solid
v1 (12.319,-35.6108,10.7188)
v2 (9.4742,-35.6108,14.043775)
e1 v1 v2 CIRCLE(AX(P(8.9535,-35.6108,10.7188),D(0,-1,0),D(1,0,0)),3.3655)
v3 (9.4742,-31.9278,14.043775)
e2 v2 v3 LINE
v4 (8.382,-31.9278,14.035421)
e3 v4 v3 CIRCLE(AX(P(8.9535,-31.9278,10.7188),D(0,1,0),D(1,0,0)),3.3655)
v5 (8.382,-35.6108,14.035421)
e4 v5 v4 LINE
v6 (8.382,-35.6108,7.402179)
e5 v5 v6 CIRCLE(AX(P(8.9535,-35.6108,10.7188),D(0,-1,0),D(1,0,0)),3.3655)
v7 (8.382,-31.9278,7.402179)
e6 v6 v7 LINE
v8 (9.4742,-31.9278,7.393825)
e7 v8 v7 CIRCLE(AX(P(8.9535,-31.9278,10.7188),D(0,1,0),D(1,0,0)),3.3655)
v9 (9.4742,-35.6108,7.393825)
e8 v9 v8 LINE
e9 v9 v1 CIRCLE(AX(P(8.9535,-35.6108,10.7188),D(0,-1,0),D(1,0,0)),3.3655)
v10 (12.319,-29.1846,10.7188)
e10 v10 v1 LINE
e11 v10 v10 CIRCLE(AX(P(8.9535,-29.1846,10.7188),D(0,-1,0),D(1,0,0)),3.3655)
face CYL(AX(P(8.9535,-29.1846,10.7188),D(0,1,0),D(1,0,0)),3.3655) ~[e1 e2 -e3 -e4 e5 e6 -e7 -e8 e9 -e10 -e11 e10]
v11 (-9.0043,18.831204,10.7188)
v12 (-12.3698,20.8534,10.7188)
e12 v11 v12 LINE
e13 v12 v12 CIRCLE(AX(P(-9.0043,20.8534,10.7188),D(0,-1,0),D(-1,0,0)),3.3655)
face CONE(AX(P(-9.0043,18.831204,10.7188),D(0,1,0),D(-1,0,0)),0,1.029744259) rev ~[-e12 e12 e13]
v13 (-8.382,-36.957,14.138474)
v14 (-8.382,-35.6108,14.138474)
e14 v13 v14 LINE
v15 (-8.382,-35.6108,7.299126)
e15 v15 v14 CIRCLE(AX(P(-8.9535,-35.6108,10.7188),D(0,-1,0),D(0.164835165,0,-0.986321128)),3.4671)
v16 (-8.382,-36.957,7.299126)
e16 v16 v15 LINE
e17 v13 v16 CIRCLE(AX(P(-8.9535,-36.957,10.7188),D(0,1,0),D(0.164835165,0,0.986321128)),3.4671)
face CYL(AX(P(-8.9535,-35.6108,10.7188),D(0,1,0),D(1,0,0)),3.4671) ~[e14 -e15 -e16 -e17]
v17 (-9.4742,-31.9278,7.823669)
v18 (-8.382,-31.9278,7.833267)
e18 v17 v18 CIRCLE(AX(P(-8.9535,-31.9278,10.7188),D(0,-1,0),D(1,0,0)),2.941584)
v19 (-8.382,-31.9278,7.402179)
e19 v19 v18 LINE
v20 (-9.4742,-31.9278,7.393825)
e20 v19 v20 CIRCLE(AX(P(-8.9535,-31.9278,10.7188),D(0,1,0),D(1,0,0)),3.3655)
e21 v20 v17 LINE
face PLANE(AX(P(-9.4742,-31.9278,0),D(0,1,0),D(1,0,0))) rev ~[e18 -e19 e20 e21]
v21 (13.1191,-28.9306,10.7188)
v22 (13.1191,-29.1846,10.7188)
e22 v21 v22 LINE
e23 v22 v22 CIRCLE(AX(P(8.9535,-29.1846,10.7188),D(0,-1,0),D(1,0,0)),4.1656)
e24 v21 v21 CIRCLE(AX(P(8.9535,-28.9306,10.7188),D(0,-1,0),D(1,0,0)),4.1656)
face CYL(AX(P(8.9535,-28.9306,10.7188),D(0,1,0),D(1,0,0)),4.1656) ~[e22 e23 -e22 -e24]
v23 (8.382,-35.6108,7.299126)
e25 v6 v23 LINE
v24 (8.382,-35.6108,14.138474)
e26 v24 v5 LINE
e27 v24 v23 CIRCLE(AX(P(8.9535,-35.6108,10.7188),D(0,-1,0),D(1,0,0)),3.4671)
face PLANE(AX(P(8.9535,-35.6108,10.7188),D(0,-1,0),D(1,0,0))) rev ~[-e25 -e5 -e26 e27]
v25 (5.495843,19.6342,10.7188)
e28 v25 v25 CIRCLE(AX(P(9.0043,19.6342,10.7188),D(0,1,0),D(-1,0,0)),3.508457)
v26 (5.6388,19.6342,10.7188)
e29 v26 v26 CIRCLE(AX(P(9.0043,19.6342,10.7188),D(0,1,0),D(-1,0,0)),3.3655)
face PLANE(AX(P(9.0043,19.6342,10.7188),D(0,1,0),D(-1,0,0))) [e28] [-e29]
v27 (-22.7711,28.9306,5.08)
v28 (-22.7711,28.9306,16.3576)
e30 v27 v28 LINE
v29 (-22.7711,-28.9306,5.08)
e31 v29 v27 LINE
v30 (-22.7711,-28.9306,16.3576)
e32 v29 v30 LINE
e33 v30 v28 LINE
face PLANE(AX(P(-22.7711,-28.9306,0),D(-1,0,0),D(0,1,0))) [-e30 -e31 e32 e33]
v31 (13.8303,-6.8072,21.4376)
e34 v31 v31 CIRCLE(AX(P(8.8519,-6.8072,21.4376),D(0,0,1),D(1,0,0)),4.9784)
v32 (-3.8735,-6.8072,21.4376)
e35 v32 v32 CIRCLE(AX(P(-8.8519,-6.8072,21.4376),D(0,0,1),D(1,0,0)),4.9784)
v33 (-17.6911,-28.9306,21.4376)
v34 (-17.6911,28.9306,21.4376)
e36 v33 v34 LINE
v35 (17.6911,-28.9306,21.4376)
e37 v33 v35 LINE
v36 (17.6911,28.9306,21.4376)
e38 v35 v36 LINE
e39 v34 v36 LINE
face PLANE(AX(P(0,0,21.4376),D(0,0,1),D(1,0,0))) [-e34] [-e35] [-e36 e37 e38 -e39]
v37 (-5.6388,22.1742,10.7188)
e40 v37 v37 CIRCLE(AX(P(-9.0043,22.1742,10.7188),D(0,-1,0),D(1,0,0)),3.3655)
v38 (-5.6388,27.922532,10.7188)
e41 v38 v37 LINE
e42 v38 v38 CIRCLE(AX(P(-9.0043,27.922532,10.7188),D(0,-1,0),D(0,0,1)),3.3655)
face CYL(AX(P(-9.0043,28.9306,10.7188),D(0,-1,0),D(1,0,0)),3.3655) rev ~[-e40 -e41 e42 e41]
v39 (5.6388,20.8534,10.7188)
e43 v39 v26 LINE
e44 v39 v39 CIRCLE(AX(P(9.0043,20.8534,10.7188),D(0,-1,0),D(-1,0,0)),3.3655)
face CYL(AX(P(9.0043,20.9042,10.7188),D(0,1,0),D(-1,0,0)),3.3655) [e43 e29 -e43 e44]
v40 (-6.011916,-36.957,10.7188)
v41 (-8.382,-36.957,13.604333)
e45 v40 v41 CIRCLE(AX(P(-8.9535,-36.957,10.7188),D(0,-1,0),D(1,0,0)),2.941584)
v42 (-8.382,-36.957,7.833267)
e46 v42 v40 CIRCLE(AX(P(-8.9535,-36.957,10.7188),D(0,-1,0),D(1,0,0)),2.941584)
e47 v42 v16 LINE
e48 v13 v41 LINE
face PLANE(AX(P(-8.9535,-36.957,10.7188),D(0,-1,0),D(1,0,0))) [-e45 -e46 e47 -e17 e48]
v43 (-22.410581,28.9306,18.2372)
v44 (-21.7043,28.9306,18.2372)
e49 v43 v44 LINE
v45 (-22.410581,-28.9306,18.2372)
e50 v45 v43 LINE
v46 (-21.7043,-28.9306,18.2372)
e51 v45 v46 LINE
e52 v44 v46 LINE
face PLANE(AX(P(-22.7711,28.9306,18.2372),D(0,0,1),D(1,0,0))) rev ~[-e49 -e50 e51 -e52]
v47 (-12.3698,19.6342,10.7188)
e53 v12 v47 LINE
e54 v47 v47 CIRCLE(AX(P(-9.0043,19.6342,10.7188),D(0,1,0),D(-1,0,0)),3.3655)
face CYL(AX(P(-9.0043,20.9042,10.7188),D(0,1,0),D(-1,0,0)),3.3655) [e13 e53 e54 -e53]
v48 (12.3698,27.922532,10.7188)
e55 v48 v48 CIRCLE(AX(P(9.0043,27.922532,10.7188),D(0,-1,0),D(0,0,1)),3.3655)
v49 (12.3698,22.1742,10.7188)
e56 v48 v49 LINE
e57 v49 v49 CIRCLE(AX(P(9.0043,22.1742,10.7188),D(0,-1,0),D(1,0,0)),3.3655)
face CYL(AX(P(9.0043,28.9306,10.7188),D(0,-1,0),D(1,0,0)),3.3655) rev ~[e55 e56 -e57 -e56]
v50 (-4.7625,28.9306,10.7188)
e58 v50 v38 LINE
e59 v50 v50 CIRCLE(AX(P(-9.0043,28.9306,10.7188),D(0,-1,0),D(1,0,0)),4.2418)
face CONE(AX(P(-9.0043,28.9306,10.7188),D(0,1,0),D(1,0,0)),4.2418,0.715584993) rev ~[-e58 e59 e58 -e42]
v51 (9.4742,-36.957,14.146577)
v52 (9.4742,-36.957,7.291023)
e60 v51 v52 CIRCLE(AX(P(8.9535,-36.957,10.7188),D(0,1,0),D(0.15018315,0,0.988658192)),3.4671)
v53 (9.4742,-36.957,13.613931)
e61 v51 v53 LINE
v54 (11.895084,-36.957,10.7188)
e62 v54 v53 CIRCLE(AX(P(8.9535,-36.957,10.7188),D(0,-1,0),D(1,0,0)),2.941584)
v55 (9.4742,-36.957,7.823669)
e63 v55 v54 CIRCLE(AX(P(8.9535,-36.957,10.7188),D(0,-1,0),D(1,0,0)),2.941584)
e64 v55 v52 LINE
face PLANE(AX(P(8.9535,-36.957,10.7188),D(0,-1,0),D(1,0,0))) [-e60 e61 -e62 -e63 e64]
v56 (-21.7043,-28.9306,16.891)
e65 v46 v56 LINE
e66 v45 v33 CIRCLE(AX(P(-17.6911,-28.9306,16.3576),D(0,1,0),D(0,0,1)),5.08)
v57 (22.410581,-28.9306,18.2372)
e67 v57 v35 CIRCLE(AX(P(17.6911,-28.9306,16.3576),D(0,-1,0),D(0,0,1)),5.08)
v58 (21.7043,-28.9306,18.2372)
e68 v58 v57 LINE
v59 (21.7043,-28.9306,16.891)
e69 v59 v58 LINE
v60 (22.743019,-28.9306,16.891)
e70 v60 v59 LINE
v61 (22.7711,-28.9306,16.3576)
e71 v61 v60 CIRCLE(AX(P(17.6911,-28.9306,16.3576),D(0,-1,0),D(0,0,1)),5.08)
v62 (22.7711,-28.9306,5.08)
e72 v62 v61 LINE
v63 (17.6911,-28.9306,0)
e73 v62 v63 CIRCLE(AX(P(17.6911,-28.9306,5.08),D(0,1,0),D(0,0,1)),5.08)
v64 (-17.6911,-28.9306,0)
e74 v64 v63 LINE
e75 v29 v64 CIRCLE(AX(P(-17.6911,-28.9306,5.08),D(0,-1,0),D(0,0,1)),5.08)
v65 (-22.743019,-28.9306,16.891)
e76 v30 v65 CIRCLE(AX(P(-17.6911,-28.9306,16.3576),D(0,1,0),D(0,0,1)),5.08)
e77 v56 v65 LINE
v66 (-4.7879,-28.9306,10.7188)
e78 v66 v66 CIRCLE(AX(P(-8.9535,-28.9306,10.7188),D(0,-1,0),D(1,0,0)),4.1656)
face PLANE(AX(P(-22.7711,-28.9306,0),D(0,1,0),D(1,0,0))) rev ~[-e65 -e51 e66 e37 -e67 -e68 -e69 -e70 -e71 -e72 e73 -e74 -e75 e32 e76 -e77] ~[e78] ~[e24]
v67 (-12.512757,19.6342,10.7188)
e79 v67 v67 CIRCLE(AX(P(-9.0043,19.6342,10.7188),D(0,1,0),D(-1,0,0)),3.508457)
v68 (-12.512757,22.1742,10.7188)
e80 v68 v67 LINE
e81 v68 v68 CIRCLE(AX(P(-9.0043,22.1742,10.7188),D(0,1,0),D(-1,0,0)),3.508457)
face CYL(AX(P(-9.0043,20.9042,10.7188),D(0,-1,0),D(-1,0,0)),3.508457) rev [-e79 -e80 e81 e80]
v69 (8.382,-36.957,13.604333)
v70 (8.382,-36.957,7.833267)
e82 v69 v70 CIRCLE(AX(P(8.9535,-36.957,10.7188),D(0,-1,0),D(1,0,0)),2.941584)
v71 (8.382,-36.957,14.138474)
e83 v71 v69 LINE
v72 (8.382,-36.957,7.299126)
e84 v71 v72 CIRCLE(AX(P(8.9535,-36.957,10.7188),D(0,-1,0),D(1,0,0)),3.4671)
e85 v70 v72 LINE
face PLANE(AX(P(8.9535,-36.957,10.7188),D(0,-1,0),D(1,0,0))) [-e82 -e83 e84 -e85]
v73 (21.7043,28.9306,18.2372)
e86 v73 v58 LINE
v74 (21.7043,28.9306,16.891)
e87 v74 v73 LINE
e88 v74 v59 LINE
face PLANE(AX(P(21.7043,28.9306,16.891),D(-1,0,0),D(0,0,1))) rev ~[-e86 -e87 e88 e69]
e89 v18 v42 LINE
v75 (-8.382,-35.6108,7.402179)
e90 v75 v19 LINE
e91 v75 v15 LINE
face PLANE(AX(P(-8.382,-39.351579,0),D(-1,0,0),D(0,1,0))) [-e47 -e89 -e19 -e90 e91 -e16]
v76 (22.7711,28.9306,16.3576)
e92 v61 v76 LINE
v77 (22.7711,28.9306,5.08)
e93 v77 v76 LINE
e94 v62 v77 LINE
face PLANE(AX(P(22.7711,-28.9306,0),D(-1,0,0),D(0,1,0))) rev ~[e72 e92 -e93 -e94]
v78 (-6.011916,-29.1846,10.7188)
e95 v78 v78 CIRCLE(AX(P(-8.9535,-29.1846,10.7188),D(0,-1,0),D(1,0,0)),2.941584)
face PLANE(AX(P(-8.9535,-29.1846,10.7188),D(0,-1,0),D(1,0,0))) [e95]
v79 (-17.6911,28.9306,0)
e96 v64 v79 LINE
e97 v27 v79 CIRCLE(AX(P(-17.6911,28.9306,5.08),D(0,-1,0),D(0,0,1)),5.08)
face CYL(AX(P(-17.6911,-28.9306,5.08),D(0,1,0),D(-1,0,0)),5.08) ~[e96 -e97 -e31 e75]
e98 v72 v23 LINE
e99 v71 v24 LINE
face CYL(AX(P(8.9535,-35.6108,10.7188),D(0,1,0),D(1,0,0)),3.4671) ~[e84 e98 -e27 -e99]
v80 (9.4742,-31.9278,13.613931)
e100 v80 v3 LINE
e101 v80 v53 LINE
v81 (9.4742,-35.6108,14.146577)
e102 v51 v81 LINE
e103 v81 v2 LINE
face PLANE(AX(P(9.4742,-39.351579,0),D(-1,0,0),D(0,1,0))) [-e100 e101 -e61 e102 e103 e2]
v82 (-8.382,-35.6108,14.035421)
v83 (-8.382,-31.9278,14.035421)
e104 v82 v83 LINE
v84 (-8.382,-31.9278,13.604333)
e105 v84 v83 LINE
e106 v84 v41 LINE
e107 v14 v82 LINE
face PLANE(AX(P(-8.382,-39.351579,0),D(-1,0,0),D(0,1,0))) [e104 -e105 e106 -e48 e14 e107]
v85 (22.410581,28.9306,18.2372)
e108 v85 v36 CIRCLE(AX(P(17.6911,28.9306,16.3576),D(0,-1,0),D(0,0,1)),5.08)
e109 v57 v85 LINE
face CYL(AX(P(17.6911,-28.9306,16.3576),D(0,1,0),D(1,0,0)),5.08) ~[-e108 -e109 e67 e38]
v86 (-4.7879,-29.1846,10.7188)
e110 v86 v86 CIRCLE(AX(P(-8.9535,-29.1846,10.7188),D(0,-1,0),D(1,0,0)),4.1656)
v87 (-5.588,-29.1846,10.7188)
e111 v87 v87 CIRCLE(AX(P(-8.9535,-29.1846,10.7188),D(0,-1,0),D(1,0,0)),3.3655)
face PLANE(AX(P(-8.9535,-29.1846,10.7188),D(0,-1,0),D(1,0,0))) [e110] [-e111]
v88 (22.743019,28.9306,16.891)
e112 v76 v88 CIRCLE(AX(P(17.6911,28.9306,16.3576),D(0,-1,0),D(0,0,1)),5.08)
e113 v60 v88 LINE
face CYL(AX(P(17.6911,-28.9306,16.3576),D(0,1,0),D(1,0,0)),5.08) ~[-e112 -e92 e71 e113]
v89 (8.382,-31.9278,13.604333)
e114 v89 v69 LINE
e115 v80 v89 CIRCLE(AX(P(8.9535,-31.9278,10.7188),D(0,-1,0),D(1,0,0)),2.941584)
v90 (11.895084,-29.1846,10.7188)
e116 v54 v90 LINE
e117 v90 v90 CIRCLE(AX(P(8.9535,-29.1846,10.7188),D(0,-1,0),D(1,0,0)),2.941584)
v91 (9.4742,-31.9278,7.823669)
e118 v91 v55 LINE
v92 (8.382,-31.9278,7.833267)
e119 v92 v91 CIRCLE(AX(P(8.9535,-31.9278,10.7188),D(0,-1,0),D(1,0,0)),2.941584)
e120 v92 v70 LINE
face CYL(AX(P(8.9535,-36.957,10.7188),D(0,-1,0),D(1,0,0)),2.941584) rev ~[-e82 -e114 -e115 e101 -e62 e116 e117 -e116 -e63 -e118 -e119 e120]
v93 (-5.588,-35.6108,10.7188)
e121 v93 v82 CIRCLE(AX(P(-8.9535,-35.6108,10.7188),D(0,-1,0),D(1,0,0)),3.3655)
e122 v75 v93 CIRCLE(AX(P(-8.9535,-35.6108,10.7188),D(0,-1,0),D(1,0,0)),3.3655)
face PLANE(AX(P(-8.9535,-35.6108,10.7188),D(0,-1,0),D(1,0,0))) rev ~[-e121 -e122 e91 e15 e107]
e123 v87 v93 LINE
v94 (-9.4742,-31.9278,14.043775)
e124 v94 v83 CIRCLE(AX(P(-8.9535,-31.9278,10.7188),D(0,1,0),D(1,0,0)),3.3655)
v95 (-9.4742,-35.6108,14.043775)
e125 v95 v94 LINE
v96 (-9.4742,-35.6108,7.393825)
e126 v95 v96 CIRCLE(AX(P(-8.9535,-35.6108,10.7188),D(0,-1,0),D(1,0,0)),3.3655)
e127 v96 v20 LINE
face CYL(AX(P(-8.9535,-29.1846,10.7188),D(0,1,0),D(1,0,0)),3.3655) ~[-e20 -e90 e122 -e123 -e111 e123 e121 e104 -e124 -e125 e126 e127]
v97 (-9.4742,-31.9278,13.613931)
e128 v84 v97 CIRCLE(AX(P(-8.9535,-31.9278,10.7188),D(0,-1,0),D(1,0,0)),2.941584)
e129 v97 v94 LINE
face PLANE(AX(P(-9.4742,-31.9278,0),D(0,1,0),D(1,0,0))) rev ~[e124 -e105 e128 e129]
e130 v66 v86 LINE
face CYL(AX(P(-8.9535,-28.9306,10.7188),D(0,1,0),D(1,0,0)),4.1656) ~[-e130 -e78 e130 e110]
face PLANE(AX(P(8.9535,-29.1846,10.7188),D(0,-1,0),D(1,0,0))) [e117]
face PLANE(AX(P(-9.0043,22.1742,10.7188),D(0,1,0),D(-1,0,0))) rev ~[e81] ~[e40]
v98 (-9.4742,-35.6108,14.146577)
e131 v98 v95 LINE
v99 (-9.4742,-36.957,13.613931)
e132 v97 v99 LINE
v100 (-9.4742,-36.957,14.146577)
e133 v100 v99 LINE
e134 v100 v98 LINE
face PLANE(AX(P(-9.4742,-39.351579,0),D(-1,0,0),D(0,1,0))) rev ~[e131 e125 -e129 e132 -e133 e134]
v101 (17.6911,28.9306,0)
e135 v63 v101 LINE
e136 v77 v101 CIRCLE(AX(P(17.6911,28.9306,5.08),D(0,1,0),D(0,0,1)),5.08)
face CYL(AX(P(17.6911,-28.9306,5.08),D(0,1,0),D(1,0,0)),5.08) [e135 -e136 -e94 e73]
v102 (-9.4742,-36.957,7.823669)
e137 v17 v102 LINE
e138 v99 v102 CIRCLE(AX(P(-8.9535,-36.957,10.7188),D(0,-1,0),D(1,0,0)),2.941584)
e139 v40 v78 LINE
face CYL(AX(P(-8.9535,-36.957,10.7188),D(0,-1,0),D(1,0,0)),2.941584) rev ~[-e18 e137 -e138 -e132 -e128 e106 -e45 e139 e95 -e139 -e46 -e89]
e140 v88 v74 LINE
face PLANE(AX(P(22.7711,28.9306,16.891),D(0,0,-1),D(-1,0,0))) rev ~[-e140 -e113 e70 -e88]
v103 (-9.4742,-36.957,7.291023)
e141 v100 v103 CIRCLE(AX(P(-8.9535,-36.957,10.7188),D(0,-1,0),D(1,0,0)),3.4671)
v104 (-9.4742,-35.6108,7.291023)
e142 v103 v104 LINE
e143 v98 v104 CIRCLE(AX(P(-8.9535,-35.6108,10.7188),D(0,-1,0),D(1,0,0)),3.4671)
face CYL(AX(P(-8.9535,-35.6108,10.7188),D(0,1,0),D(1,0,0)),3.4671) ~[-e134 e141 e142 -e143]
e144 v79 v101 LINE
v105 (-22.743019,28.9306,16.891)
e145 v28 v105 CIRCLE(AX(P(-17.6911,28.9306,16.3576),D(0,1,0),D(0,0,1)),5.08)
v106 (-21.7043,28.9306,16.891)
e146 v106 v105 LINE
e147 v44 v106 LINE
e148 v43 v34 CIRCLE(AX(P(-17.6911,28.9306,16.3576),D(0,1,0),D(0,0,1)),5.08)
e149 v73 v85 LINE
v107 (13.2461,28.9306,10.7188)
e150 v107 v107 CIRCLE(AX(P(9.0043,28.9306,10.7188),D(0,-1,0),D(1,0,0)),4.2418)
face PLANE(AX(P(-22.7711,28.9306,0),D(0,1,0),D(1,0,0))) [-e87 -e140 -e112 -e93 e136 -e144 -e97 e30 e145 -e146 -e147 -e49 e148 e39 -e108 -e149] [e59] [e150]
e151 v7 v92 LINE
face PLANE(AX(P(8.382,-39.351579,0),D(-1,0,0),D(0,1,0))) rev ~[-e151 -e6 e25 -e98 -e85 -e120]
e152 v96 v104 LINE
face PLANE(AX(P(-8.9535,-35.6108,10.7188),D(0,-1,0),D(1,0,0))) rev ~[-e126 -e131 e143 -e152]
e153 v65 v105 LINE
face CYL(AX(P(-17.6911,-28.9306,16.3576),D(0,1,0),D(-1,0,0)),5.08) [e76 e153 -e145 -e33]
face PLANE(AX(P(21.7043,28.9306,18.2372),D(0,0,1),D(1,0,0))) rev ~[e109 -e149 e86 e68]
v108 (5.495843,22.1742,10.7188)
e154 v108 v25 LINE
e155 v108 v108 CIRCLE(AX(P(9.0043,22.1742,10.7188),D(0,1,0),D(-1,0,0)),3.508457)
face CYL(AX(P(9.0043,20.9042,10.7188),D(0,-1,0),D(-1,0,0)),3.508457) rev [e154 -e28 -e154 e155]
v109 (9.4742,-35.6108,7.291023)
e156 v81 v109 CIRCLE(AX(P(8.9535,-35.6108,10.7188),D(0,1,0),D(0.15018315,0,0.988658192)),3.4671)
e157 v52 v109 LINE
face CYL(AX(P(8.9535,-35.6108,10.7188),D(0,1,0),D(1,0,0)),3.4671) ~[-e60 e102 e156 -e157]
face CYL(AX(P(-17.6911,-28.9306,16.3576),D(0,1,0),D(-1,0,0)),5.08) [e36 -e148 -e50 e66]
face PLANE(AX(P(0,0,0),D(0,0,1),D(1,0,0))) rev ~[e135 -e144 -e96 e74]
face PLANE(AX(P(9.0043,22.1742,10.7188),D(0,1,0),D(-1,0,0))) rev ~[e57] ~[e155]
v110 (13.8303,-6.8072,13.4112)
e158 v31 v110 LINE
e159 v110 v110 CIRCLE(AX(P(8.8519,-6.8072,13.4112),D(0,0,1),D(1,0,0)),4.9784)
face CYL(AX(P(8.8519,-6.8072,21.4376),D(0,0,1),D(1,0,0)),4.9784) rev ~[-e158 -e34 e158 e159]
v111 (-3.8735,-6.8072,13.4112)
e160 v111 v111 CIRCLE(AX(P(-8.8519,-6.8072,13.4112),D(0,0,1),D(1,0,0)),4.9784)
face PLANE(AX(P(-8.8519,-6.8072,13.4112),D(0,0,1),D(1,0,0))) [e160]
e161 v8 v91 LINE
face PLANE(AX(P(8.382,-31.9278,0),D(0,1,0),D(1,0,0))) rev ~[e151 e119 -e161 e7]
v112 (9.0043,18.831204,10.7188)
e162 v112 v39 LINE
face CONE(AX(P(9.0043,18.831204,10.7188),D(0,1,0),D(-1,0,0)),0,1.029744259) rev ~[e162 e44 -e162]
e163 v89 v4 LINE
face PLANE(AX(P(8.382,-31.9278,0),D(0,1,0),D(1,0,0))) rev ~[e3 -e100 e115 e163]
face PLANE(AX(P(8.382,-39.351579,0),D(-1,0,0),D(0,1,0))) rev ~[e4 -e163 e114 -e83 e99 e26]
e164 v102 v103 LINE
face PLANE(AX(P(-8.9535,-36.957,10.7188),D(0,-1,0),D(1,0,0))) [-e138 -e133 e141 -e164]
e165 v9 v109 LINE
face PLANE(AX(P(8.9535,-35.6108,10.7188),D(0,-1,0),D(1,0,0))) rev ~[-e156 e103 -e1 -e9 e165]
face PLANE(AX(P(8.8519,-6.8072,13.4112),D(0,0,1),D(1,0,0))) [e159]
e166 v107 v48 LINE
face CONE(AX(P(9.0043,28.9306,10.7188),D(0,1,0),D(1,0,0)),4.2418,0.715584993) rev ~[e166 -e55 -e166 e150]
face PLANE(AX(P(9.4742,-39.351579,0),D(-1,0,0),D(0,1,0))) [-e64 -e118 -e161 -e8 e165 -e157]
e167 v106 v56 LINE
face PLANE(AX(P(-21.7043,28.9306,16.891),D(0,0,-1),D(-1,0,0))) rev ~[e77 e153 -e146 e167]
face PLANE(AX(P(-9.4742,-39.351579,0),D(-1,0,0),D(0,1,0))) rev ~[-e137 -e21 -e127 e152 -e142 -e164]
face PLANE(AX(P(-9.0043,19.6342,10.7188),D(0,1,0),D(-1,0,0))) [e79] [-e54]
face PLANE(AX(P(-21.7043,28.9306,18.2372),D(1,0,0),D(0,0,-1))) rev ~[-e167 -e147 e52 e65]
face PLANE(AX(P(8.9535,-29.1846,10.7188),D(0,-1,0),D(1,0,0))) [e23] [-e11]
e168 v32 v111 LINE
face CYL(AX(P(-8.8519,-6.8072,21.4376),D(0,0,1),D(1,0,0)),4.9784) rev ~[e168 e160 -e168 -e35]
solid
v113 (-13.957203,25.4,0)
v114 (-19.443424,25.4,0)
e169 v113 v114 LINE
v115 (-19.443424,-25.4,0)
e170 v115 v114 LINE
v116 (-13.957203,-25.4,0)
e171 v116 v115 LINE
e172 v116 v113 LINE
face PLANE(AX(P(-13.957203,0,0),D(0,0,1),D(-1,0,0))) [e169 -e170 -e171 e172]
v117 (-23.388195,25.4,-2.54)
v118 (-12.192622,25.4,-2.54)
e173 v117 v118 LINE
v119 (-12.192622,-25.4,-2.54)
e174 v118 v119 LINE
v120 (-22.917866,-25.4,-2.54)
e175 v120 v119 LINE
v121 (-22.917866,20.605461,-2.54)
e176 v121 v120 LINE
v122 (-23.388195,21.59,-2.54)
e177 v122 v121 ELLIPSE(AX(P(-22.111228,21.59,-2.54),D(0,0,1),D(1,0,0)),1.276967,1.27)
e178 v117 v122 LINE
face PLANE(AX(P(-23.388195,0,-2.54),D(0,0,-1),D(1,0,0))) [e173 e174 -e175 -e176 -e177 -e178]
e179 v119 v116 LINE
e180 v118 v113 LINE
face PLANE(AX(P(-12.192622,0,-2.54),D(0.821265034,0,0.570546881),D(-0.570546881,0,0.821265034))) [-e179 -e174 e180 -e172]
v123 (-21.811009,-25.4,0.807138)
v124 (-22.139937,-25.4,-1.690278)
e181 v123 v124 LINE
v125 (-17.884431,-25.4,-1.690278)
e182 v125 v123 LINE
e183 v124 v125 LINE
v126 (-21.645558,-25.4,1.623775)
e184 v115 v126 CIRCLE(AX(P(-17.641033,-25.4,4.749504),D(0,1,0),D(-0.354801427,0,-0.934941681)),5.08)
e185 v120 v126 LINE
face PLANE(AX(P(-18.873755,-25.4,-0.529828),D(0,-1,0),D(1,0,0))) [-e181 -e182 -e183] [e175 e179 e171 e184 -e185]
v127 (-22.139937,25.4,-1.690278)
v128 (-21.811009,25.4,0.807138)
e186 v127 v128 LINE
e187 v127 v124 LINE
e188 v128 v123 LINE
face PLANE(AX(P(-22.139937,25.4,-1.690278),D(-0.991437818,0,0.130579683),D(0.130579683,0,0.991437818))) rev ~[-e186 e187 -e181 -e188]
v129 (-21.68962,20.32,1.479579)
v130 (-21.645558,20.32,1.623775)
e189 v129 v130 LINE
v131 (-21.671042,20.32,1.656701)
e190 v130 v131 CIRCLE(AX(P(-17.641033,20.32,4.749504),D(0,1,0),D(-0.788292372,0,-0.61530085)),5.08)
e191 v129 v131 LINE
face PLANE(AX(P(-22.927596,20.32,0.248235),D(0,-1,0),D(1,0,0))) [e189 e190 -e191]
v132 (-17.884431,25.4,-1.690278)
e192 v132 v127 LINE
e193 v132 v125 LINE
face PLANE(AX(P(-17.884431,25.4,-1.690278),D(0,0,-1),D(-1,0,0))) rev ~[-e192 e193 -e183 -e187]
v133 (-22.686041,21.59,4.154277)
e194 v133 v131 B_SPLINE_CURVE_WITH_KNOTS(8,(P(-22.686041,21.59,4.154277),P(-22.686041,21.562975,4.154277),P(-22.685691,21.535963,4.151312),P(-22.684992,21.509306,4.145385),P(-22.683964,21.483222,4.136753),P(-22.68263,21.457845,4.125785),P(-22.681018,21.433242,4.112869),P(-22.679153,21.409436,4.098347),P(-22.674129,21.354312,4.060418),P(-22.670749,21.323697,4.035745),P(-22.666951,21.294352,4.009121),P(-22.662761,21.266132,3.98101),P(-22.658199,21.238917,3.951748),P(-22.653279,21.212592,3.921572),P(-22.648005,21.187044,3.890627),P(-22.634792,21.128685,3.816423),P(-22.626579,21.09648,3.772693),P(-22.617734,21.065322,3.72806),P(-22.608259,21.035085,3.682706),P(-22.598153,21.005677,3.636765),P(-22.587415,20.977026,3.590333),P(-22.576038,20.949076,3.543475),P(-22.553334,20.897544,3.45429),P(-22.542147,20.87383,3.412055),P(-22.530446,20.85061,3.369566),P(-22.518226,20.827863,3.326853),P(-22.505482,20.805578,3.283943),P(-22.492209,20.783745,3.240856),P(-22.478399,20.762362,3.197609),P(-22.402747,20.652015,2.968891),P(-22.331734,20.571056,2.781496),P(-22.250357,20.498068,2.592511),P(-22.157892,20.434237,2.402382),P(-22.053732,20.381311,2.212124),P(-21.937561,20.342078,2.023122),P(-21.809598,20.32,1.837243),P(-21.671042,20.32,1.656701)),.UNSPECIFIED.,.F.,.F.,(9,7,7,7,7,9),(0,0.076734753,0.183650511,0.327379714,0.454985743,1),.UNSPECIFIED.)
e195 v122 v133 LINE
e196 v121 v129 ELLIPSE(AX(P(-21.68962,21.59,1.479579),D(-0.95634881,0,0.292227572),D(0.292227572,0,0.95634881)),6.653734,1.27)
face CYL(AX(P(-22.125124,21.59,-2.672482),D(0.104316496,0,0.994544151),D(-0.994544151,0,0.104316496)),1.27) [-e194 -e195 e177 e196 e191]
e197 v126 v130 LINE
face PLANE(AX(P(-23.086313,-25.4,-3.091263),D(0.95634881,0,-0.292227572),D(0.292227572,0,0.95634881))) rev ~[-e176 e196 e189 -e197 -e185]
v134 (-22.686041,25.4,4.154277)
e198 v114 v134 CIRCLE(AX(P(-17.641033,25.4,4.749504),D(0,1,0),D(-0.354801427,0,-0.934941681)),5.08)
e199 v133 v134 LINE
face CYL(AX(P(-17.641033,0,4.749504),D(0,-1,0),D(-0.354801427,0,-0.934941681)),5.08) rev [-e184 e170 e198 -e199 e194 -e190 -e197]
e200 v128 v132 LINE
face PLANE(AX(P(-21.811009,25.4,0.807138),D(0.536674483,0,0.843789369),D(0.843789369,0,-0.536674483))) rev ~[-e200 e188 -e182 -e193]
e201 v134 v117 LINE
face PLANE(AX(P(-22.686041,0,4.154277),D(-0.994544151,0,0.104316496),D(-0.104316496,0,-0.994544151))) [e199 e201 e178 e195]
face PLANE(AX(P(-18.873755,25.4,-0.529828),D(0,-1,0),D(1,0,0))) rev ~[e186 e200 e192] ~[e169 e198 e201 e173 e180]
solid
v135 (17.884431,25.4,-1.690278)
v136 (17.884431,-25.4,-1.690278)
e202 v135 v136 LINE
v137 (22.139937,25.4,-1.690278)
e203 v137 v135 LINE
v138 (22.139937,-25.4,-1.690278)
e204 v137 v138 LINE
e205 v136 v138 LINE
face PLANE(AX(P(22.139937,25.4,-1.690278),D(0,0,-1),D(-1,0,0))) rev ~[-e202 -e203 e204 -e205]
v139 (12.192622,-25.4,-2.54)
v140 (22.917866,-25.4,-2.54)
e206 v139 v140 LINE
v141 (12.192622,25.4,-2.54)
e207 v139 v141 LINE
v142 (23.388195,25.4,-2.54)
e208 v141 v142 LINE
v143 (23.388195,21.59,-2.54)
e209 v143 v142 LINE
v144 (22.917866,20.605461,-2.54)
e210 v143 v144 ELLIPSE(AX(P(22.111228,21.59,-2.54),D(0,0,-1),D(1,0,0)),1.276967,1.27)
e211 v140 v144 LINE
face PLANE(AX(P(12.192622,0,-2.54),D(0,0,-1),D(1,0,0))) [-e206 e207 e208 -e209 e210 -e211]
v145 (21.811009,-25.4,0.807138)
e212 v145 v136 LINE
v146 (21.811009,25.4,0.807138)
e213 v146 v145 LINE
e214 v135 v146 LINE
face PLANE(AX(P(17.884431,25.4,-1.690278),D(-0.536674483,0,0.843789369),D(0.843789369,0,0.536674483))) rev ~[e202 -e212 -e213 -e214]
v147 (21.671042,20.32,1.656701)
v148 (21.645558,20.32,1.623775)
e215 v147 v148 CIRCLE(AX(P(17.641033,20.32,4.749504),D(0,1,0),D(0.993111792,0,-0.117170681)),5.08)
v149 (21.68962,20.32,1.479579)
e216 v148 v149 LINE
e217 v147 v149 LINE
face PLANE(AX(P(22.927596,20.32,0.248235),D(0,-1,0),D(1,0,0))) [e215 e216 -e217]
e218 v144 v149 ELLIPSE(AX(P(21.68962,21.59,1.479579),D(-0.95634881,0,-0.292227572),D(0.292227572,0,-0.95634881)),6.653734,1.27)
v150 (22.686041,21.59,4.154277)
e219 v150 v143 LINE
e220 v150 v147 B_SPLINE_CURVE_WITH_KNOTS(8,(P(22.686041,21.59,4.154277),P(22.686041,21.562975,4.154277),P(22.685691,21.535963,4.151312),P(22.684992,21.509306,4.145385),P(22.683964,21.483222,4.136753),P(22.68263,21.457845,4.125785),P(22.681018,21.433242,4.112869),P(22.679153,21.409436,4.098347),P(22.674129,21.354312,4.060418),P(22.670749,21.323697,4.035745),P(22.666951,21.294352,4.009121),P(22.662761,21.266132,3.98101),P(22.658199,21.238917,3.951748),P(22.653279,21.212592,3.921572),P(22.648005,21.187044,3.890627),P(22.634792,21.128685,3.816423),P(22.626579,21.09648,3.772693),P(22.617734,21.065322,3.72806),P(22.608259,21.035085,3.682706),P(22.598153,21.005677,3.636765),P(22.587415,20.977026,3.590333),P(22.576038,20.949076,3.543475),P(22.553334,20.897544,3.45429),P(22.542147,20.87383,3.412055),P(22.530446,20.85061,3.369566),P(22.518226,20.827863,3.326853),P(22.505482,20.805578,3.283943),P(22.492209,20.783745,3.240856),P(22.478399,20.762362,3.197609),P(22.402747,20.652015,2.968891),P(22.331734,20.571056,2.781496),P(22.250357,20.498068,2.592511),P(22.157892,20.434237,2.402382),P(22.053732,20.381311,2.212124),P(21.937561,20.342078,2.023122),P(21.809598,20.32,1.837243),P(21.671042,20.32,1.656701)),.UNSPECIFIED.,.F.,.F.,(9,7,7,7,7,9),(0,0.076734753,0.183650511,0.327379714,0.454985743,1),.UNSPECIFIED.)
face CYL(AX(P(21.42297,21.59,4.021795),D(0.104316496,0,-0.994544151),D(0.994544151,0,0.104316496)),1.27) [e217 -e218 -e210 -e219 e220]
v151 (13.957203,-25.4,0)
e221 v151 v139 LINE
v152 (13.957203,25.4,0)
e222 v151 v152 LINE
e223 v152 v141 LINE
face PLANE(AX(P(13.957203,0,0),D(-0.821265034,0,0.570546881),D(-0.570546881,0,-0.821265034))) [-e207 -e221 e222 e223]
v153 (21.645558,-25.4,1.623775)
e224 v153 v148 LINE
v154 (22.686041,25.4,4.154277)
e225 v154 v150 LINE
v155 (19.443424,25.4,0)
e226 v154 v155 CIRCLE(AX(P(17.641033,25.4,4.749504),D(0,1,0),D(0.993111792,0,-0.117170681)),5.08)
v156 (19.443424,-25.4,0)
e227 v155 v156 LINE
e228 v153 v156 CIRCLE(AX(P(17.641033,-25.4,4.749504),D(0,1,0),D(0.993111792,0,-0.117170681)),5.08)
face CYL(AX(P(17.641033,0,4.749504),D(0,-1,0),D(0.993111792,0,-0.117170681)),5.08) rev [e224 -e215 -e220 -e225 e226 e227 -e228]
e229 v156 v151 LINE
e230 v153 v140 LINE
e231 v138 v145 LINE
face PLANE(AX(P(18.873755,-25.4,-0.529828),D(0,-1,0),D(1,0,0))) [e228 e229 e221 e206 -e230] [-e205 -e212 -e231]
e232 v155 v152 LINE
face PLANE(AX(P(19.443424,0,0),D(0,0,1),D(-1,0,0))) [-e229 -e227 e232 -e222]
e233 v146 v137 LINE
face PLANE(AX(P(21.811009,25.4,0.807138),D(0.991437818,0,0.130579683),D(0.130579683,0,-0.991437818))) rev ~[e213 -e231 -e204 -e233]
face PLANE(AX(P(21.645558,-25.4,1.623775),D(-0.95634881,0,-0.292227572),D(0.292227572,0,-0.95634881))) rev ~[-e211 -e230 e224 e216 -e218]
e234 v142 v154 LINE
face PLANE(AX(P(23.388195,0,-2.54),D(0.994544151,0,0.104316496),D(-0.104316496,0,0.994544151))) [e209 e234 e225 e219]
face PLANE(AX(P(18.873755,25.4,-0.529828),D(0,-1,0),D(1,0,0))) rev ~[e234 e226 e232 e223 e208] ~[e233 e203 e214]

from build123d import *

# Parameters (mm, degrees)
F0_W            = 45.5422
F0_H            = 57.8612
F1_DEPTH        = 21.4376
F2_R            = 5.08
F3_R            = 4.1656
F4_DEPTH        = 0.254
F5_R            = 3.3655
F6_DEPTH        = 6.4262
F7_R            = 3.4671
F8_DEPTH        = 1.3462
F9_W            = 1.0922
F9_H            = 7.4237788019
F10_DEPTH       = 21.4386
F11_R           = 2.9415835505
F12_DEPTH       = 7.7724
F14_D           = 6.731
F14_DEPTH       = 8.0772
F14_CSINK_D     = 8.4836
F14_CSINK_ANGLE = 82
F14_TIP         = 2.0221964133
F15_R           = 4.9784
F16_DEPTH       = 8.0264
F18_DEPTH       = 25.4
F18_DEPTH_BACK  = 25.4
F20_DEPTH       = 62.358
F22_DEPTH       = 45.72
F23_R           = 1.27
F24_R           = 1.27
F26_R           = 3.5084573534
F26_R_2         = 3.3655
F27_DEPTH       = 1.27
F27_DEPTH_BACK  = 1.27
F29_DEPTH       = 65.8886


# Not quite as in the source:
# - a feature names something its author has since deleted; it is built from what else it names


with BuildPart() as f1:
    # F0 (on Top) → F1 (new body)
    with BuildSketch(Plane.XY):
        Rectangle(F0_W, F0_H)
    extrude(amount=F1_DEPTH)

    # F2
    f2_edges = [f1.edges().sort_by_distance(p)[0] for p in [
        (-22.7711, 0, 21.4376),
        (22.7711, 0, 21.4376),
        (22.7711, 0, 0),
        (-22.7711, 0, 0),
    ]]
    fillet(f2_edges, radius=F2_R)

    # F3 (on face) → F4 (join)
    with BuildSketch(Plane.XZ.offset(28.9306)):
        with Locations((-8.9535, 10.7188)):
            Circle(F3_R)
        with Locations((8.9535, 10.7188)):
            Circle(F3_R)
    extrude(amount=F4_DEPTH)

    # F5 (on face) → F6 (join)
    with BuildSketch(Plane.XZ.offset(29.1846)):
        with Locations((-8.9535, 10.7188)):
            Circle(F5_R)
        with Locations((8.9535, 10.7188)):
            Circle(F5_R)
    extrude(amount=F6_DEPTH)

    # F7 (on face) → F8 (join)
    with BuildSketch(Plane.XZ.offset(35.6108)):
        with Locations((-8.9535, 10.7188)):
            Circle(F7_R)
        with Locations((8.9535, 10.7188)):
            Circle(F7_R)
    extrude(amount=F8_DEPTH)

    # F9 (on Top) → F10 (cut, through all)
    with BuildSketch(Plane.XY):
        with Locations((-8.9281, -35.6396894009)):
            Rectangle(F9_W, F9_H)
        with Locations((8.9281, -35.6396894009)):
            Rectangle(F9_W, F9_H)
    extrude(amount=F10_DEPTH, mode=Mode.SUBTRACT)

    # F11 (on face) → F12 (cut, through all)
    with BuildSketch(Plane.XZ.offset(36.957)):
        with Locations((-8.9535, 10.7188)):
            Circle(F11_R)
        with Locations((8.9535, 10.7188)):
            Circle(F11_R)
    extrude(amount=-F12_DEPTH, mode=Mode.SUBTRACT)

    # F14
    with Locations(Plane(origin=(0, 28.9306, 0), x_dir=(-1, 0, 0), z_dir=(0, 1, 0))):
        with Locations((-9.0043, 10.7188), (9.0043, 10.7188)):
            CounterSinkHole(F14_D / 2, F14_CSINK_D / 2, depth=F14_DEPTH, counter_sink_angle=F14_CSINK_ANGLE)
            with Locations((0, 0, -(F14_DEPTH + F14_TIP / 2))):  # 118° drill point
                Cone(0, F14_D / 2, F14_TIP, mode=Mode.SUBTRACT)

    # F15 (on face) → F16 (cut)
    with BuildSketch(Plane.XY.offset(21.4376)):
        with Locations((-8.8519, -6.8072)):
            Circle(F15_R)
        with Locations((8.8519, -6.8072)):
            Circle(F15_R)
    extrude(amount=-F16_DEPTH, mode=Mode.SUBTRACT)

    # F26 (on offset) → F27 (cut, two sides)
    with BuildSketch(Plane(origin=(0, 20.9042, 0), x_dir=(-1, 0, 0), z_dir=(0, 1, 0))) as f27_sk:
        with Locations((-9.0043, 10.7188)):
            Circle(F26_R)
        with Locations((-9.0043, 10.7188)):
            Circle(F26_R_2, mode=Mode.SUBTRACT)
        with Locations((9.0043, 10.7188)):
            Circle(F26_R)
        with Locations((9.0043, 10.7188)):
            Circle(F26_R_2, mode=Mode.SUBTRACT)
    extrude(amount=-F27_DEPTH, mode=Mode.SUBTRACT)
    extrude(f27_sk.sketch, amount=F27_DEPTH_BACK, mode=Mode.SUBTRACT)

    # F28 (on face) → F29 (cut, through all)
    with BuildSketch(Plane(origin=(0, 28.9306, 0), x_dir=(-1, 0, 0), z_dir=(0, 1, 0))):
        with BuildLine():
            ThreePointArc((-22.7430188869, 16.891), (-22.622948443, 17.5754961103), (-22.4105813105, 18.2372))
            Line((-22.4105813105, 18.2372), (-22.7711, 18.2372))
            Line((-22.7711, 18.2372), (-22.7711, 16.891))
            Line((-22.7711, 16.891), (-22.7430188869, 16.891))
        make_face()
        with BuildLine():
            Line((22.7711, 16.891), (22.7711, 18.2372))
            Line((22.7711, 18.2372), (22.4105813105, 18.2372))
            ThreePointArc((22.4105813105, 18.2372), (22.622948443, 17.5754961103), (22.7430188869, 16.891))
            Line((22.7430188869, 16.891), (22.7711, 16.891))
        make_face()
        with BuildLine():
            ThreePointArc((22.7430188869, 16.891), (22.622948443, 17.5754961103), (22.4105813105, 18.2372))
            Line((22.4105813105, 18.2372), (21.7043, 18.2372))
            Line((21.7043, 18.2372), (21.7043, 16.891))
            Line((21.7043, 16.891), (22.7430188869, 16.891))
        make_face()
        with BuildLine():
            Line((-21.7043, 18.2372), (-22.4105813105, 18.2372))
            ThreePointArc((-22.4105813105, 18.2372), (-22.622948443, 17.5754961103), (-22.7430188869, 16.891))
            Line((-22.7430188869, 16.891), (-21.7043, 16.891))
            Line((-21.7043, 16.891), (-21.7043, 18.2372))
        make_face()
    extrude(amount=-F29_DEPTH, mode=Mode.SUBTRACT)


with BuildPart() as f18:
    # F17 (on Front) → F18 (new body, two sides)
    with BuildSketch(Plane.XZ) as f18_sk:
        with BuildLine():
            Line((-22.6860410745, 4.1542766816), (-23.3881954099, -2.54))
            Line((-23.3881954099, -2.54), (-12.1926218763, -2.54))
            Line((-12.1926218763, -2.54), (-13.9572033659, 0))
            Line((-13.9572033659, 0), (-19.4434244186, 0))
            ThreePointArc((-19.4434244186, 0), (-21.64555842, 1.6237754217), (-22.6860410745, 4.1542766816))
        make_face()
    extrude(amount=F18_DEPTH)
    extrude(f18_sk.sketch, amount=-F18_DEPTH_BACK)


with BuildPart() as f18b:
    # F17 (on Front) → F18, piece 2 (new body, two sides)
    with BuildSketch(Plane.XZ) as f18_2_sk:
        with BuildLine():
            Line((23.3881954099, -2.54), (22.6860410745, 4.1542766816))
            ThreePointArc((22.6860410745, 4.1542766816), (21.64555842, 1.6237754217), (19.4434244186, 0))
            Line((19.4434244186, 0), (13.9572033659, 0))
            Line((13.9572033659, 0), (12.1926218763, -2.54))
            Line((12.1926218763, -2.54), (23.3881954099, -2.54))
        make_face()
    extrude(amount=F18_DEPTH)
    extrude(f18_2_sk.sketch, amount=-F18_DEPTH_BACK)


with BuildPart() as f20_tool:
    # F19 (on face) → F20 (new body, through all)
    with BuildSketch(Plane(origin=(0, 25.4, 0), x_dir=(-1, 0, 0), z_dir=(0, 1, 0))):
        Polygon((-17.8844314561, -1.6902784118), (-21.8110085026, 0.8071383408), (-22.1399367348, -1.6902784118), align=None)
        Polygon((17.8844314561, -1.6902784118), (22.1399367348, -1.6902784118), (21.8110085026, 0.8071383408), align=None)
    extrude(amount=-F20_DEPTH)


with BuildPart() as f18_1:
    add(f18.part)

    # F20: cut by f20_tool
    add(f20_tool.part, mode=Mode.SUBTRACT)


with BuildPart() as f18b_1:
    add(f18b.part)

    # F20: cut by f20_tool
    add(f20_tool.part, mode=Mode.SUBTRACT)


with BuildPart() as f22_tool:
    # F21 (on face) → F22 (new body)
    with BuildSketch(Plane.XZ.offset(25.4)):
        with BuildLine():
            ThreePointArc((-21.64555842, 1.6237754217), (-22.3393702945, 2.8176579213), (-22.6860410745, 4.1542766816))
            Line((-22.6860410745, 4.1542766816), (-24.1758879766, -3.2762847841))
            Line((-24.1758879766, -3.2762847841), (-23.0863132075, -3.0912626535))
            Line((-23.0863132075, -3.0912626535), (-21.64555842, 1.6237754217))
        make_face()
        with BuildLine():
            Line((21.64555842, 1.6237754217), (23.0863132075, -3.0912626535))
            Line((23.0863132075, -3.0912626535), (24.1758879766, -3.2762847841))
            Line((24.1758879766, -3.2762847841), (22.6860410745, 4.1542766816))
            ThreePointArc((22.6860410745, 4.1542766816), (22.3393702945, 2.8176579213), (21.64555842, 1.6237754217))
        make_face()
    extrude(amount=-F22_DEPTH)


with BuildPart() as f18_2:
    add(f18_1.part)

    # F22: cut by f22_tool
    add(f22_tool.part, mode=Mode.SUBTRACT)

    # F23
    f23_edges = [f18_2.edges().sort_by_distance(p)[0] for p in [
        (-23.037118, 20.32, 0.807138),
    ]]
    fillet(f23_edges, radius=F23_R)


with BuildPart() as f18b_2:
    add(f18b_1.part)

    # F22: cut by f22_tool
    add(f22_tool.part, mode=Mode.SUBTRACT)

    # F24
    f24_edges = [f18b_2.edges().sort_by_distance(p)[0] for p in [
        (23.037118, 20.32, 0.807138),
    ]]
    fillet(f24_edges, radius=F24_R)


solid = Compound([f1.part, f18_2.part, f18b_2.part])
